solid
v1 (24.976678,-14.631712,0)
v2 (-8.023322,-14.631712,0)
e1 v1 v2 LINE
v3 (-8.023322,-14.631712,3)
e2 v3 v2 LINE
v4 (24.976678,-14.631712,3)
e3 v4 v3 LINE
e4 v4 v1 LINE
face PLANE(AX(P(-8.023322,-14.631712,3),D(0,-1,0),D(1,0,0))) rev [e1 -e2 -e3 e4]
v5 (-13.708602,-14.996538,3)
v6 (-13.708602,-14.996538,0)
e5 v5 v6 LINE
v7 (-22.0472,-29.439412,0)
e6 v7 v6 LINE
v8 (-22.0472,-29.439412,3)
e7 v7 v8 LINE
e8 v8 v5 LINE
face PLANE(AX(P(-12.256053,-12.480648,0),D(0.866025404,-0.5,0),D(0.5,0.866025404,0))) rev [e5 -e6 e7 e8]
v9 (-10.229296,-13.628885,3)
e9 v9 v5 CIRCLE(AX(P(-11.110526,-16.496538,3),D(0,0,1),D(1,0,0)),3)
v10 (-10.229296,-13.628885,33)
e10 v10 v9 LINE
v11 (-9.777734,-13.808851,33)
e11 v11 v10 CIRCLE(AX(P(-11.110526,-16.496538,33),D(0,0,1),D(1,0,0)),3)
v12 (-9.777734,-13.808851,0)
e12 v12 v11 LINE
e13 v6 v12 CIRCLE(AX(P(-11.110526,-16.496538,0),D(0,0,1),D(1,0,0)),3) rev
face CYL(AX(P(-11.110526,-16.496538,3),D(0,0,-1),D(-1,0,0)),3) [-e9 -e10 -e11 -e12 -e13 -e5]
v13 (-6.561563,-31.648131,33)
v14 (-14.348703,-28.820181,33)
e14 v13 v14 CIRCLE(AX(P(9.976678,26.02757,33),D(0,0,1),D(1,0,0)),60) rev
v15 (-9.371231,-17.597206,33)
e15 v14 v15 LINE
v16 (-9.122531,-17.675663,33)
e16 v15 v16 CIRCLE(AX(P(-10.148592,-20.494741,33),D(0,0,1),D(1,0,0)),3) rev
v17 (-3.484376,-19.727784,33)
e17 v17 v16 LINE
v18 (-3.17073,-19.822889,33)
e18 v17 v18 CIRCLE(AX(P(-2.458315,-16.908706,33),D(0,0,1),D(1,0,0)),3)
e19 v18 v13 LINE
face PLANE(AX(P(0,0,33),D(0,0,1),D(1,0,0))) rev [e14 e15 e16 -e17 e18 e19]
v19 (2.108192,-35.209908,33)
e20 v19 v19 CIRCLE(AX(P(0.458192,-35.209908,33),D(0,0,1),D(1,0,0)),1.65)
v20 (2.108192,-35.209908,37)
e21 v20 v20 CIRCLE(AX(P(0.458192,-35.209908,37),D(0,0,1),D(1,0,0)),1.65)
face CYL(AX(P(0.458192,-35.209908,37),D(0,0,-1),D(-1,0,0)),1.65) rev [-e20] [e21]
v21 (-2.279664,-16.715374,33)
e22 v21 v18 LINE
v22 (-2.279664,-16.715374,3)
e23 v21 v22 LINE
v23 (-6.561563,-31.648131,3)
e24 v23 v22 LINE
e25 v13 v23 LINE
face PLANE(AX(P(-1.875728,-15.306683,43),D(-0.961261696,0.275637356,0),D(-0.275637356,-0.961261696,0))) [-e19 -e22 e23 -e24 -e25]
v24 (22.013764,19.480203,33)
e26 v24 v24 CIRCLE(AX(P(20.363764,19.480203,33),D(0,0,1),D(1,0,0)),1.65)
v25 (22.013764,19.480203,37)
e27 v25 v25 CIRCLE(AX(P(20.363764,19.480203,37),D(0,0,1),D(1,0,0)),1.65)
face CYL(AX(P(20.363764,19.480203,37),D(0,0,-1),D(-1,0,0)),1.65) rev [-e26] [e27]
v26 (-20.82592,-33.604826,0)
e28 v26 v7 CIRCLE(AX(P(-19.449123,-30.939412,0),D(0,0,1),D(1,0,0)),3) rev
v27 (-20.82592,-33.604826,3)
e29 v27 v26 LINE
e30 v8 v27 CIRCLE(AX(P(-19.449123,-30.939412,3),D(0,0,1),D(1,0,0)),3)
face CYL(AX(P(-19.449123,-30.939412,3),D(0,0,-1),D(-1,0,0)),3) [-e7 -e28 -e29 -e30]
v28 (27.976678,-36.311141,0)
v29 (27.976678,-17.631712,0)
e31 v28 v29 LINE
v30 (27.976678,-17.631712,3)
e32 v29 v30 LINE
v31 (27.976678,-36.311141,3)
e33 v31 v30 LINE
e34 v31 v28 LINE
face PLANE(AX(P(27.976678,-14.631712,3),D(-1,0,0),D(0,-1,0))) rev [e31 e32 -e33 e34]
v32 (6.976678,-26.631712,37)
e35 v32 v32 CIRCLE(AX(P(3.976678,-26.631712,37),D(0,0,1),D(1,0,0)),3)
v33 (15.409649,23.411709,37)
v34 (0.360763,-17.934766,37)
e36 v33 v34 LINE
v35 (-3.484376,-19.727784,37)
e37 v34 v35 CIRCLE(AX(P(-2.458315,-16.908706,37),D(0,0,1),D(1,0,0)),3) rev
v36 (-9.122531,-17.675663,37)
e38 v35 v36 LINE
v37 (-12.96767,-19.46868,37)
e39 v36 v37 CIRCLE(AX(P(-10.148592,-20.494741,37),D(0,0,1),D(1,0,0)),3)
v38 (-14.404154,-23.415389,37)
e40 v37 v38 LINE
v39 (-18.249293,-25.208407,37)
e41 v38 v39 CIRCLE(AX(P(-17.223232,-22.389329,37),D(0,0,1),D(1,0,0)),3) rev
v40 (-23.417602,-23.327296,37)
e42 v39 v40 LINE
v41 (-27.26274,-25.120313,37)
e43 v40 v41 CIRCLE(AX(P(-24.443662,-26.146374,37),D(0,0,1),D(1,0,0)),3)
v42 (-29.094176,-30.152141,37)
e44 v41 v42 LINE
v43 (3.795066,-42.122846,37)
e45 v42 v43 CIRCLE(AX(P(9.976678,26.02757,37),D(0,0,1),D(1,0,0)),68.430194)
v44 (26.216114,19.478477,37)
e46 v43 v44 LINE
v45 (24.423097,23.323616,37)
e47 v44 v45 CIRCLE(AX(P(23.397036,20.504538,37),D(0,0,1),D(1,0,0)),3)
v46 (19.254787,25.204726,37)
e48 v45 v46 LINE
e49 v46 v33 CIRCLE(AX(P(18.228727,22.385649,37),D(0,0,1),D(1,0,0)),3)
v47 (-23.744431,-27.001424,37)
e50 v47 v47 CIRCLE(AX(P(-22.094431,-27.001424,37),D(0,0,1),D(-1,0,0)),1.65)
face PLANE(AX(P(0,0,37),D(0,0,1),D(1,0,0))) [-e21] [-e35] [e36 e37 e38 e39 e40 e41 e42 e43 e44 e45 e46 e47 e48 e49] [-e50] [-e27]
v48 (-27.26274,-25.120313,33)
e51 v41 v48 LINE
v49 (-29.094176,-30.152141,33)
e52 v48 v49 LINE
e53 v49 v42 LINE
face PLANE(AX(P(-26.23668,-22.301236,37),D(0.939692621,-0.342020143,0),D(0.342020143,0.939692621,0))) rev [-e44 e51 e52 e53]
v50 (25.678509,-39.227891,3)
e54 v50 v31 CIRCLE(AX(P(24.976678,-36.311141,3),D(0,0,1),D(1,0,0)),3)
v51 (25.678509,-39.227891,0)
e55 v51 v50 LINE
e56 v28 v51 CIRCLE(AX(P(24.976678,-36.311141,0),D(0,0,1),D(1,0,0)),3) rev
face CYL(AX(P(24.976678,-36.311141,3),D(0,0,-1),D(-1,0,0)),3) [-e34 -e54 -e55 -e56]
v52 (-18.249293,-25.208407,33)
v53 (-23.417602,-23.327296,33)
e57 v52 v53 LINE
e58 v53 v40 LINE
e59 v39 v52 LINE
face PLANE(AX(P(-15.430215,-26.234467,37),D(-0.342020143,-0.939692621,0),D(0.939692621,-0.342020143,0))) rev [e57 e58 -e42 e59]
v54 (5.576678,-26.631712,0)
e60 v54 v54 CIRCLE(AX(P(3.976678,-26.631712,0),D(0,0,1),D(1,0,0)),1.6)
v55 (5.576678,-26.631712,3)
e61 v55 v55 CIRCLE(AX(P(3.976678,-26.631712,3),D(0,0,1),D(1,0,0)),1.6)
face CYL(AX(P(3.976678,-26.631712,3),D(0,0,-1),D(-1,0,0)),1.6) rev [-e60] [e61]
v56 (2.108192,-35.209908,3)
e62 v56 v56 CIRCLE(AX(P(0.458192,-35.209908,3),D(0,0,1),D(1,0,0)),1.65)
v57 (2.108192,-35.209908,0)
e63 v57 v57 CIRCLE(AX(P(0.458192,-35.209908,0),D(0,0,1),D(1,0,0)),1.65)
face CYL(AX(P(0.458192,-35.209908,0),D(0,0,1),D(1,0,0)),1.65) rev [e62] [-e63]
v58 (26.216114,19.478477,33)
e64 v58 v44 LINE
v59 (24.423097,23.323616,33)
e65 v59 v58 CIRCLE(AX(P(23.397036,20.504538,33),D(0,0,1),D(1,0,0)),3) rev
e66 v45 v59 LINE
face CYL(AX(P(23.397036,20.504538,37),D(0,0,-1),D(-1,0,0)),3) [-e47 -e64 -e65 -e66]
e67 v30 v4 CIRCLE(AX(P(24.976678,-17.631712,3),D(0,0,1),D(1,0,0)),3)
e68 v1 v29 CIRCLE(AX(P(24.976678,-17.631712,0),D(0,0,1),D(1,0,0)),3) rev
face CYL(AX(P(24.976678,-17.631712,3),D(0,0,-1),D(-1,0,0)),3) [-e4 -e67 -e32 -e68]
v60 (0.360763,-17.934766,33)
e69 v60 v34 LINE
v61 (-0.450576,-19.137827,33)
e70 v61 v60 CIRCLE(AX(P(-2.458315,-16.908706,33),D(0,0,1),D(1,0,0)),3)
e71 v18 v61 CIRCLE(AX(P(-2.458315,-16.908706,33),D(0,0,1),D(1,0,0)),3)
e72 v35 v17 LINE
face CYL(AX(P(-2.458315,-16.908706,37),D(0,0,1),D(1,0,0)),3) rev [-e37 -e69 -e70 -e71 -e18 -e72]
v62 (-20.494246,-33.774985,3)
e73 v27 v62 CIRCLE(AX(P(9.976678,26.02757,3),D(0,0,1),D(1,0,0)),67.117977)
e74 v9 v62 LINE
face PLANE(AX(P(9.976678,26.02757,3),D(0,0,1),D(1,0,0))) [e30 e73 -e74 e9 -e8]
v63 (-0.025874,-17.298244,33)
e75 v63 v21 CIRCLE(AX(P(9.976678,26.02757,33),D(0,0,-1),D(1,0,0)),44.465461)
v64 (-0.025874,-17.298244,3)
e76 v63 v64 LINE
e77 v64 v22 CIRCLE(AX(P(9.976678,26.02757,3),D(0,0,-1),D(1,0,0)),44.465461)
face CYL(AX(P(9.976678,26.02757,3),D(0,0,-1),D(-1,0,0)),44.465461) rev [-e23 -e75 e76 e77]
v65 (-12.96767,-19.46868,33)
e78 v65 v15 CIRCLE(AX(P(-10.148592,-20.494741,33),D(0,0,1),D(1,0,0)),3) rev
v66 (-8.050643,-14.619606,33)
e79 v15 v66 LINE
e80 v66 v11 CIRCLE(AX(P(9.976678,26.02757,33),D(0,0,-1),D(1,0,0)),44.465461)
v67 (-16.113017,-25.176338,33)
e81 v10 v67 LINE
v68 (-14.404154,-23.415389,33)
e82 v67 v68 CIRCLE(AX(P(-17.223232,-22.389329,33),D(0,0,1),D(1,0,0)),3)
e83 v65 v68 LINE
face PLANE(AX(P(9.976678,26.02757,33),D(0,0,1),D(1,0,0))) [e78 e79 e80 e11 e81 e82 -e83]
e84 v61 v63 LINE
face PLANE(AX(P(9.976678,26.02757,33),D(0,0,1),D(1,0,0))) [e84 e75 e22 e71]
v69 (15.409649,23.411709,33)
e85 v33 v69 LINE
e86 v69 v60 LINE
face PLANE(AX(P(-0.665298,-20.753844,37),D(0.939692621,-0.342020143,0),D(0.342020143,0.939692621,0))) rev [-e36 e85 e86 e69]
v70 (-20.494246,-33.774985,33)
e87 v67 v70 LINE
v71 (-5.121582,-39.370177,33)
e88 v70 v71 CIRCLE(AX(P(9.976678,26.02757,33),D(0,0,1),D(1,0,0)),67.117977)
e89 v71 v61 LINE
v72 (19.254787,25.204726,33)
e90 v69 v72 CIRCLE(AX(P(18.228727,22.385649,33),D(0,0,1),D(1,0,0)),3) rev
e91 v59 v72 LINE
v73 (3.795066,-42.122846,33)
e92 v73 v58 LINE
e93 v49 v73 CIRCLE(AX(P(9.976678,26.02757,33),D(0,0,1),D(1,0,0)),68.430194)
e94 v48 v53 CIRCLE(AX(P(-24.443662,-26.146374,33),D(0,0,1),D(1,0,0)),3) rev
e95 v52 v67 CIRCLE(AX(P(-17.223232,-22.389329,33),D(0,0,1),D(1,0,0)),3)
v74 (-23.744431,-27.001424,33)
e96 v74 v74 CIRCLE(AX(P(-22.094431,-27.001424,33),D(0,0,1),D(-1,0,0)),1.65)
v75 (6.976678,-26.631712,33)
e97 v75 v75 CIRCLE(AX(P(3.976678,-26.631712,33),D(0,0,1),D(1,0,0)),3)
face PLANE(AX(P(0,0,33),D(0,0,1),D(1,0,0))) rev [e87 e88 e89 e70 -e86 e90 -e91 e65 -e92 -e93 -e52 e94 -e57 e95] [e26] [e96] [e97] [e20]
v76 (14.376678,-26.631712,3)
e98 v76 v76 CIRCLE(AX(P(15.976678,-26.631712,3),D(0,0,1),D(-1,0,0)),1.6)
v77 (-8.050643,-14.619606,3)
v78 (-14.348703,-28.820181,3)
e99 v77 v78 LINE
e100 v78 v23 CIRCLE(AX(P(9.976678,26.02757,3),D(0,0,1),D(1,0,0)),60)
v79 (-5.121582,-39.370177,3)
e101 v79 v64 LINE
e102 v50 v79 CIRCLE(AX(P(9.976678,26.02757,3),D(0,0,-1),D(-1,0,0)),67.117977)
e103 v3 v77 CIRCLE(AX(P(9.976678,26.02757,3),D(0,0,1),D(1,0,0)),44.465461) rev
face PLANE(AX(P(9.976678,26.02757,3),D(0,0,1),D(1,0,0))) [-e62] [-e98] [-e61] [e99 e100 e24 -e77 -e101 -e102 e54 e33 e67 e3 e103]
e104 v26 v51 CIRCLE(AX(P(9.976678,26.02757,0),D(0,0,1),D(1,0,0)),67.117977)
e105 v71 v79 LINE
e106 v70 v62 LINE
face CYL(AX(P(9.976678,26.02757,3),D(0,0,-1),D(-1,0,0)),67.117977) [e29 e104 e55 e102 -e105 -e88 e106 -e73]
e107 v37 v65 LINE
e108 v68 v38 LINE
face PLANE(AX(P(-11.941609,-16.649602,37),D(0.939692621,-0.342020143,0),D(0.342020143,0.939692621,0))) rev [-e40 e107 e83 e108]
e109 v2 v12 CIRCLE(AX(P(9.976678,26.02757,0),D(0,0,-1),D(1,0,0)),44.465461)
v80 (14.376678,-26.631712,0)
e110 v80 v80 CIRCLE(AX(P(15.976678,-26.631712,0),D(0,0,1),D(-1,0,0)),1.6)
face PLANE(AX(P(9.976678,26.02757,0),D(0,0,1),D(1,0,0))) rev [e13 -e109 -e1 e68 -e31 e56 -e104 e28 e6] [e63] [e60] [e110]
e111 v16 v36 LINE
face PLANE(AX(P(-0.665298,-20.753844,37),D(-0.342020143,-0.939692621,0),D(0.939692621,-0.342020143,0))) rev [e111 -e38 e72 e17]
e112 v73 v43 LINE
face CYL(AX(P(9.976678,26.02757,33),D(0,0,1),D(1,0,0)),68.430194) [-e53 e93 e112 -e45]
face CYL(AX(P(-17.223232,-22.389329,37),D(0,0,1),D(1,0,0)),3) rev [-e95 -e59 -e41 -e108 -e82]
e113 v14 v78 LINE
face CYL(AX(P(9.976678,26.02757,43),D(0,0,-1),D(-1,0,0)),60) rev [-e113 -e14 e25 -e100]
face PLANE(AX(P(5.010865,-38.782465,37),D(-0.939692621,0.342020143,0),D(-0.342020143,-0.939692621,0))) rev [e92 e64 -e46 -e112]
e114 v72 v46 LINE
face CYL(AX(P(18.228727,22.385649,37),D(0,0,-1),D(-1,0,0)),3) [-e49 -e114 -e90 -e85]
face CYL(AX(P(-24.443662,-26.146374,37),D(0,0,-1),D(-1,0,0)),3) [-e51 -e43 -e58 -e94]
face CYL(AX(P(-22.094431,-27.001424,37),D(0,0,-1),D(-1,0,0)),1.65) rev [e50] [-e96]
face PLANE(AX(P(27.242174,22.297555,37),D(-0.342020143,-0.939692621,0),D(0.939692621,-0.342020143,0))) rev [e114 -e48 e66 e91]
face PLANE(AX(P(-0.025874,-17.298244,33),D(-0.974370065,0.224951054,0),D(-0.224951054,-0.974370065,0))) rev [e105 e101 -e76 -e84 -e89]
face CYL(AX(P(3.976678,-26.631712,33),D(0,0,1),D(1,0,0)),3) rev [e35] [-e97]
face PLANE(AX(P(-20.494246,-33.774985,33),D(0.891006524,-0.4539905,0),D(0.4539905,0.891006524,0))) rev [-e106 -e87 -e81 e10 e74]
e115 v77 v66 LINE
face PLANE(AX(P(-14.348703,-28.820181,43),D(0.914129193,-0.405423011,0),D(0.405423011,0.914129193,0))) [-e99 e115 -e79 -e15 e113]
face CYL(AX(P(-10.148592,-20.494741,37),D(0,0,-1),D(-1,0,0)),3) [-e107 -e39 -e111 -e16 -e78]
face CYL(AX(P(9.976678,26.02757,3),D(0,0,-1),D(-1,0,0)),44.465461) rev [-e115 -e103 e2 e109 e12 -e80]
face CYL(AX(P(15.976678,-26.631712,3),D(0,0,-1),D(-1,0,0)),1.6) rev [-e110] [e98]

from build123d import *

# Parameters (mm, degrees)
SKETCH_1_R          = 1.600000000000001
SKETCH_1_R_2        = 1.6000000000000019
SKETCH_1_R_3        = 1.5999999999999985
EXTRUDE_1_DEPTH     = 3
EXTRUDE_2_DEPTH     = 30
CUT_EXTRUDE_1_DEPTH = 40
SKETCH_4_R          = 1.6499999999999986
SKETCH_4_R_2        = 1.6499999999999997
EXTRUDE_3_DEPTH     = 4
CUT_EXTRUDE_START   = -3
CUT_EXTRUDE_5_DEPTH = 3
EXTRUDE_4_DEPTH     = 3
FILLET_2_R          = 3
EXTRUDE_5_DEPTH     = 4
SKETCH_10_R         = 2.9999999999999996
CUT_EXTRUDE_6_DEPTH = 4
SKETCH_11_R         = 1.6500000000000008
CUT_EXTRUDE_7_DEPTH = 62.45571715470519


with BuildPart() as part:
    # 草图1 → 凸台-拉伸1 (new body)
    with BuildSketch(Plane.XY):
        with BuildLine():
            Line((-8.023322075989554, -14.631711796201198), (27.976677924010442, -14.631711796201193))
            Line((27.976677924010442, -14.631711796201193), (27.976677924010446, -38.631711796201195))
            Line((27.976677924010446, -38.631711796201195), (-8.023322075989551, -38.6317117962012))
            ThreePointArc((-8.023322075989551, -38.6317117962012), (-43.46930578748299, -14.57230150362017), (-57.14129859782335, 26.027570386525145))
            Line((-57.14129859782335, 26.027570386525145), (-34.48878313976992, 26.027570386525145))
            ThreePointArc((-34.48878313976992, 26.027570386525145), (-27.28963076602897, 1.7706236653637966), (-8.023322075989554, -14.631711796201198))
        make_face()
        with Locations((3.976677924010446, -26.6317117962012)):
            Circle(SKETCH_1_R, mode=Mode.SUBTRACT)
        with Locations(Location((15.976677924010446, -26.6317117962012, 0), (0, 0, 180))):
            Circle(SKETCH_1_R_2, mode=Mode.SUBTRACT)
        with Locations((-42.682604258715905, 20.02757038652514)):
            Circle(SKETCH_1_R_3, mode=Mode.SUBTRACT)
    extrude(amount=EXTRUDE_1_DEPTH)

    # 草图2 → 凸台-拉伸2 (add)
    with BuildSketch(Plane.XY.offset(3)):
        with BuildLine():
            Line((-20.49424577864387, -33.77498458475056), (-10.210218965484446, -13.591445522347069))
            ThreePointArc((-10.210218965484446, -13.591445522347069), (-5.231405442065514, -15.756295254952452), (-0.02587442417285965, -17.298243790895924))
            Line((-0.02587442417285965, -17.298243790895924), (-5.121581660002594, -39.370176745308015))
            ThreePointArc((-5.121581660002594, -39.370176745308015), (-12.979022025715798, -37.042696873124), (-20.49424577864387, -33.77498458475056))
        make_face()
    extrude(amount=EXTRUDE_2_DEPTH)

    # 草图3 → 切除-拉伸1 (cut)
    with BuildSketch(Plane.XY.offset(3)):
        with BuildLine():
            Line((-14.348702760927614, -28.820181203971632), (-7.456511566861831, -13.279984919997544))
            ThreePointArc((-7.456511566861831, -13.279984919997544), (-4.701142282615541, -14.38977235123981), (-1.875728376120071, -15.30668253882269))
            Line((-1.875728376120071, -15.30668253882269), (-6.561563425008877, -31.648131369774166))
            ThreePointArc((-6.561563425008877, -31.648131369774166), (-10.504001434072327, -30.368721805705025), (-14.348702760927614, -28.820181203971632))
        make_face()
    extrude(amount=CUT_EXTRUDE_1_DEPTH, mode=Mode.SUBTRACT)

    # 草图4 → 凸台-拉伸3 (add)
    with BuildSketch(Plane.XY.offset(33)):
        Polygon((-27.87837659400939, -26.811760111104594), (5.010865133497435, -38.782465127502874), (27.24217444966564, 22.297555223581274), (16.435709310627683, 26.230786871826414), (-0.6652978556555434, -20.753844167469087), (-11.941609305086462, -16.649602447561108), (-15.43021476700824, -26.234467179577372), (-26.236679906046202, -22.30123553133223), align=None)
        with Locations((20.36376431871485, 19.48020290794287)):
            Circle(SKETCH_4_R, mode=Mode.SUBTRACT)
        with Locations((0.4581919771611356, -35.20990762179707)):
            Circle(SKETCH_4_R_2, mode=Mode.SUBTRACT)
        with Locations(Location((-22.094430921700695, -27.001424181981108, 0), (0, 0, 180))):
            Circle(SKETCH_4_R, mode=Mode.SUBTRACT)
    extrude(amount=EXTRUDE_3_DEPTH)

    # 草图7 → 切除-拉伸5 (cut)
    with BuildSketch(Plane.XY.offset(3).offset(CUT_EXTRUDE_START)):
        with BuildLine():
            Line((-12.256052607879635, -12.480648485696536), (-23.582310336906296, -32.09830233199053))
            ThreePointArc((-23.582310336906296, -32.09830233199053), (-48.149194794505114, -7.53141787439181), (-57.14129859782335, 26.027570386525152))
            Line((-57.14129859782335, 26.027570386525152), (-34.48878313976992, 26.027570386525145))
            ThreePointArc((-34.48878313976992, 26.027570386525145), (-28.53154094821116, 3.794839854634926), (-12.256052607879635, -12.480648485696536))
        make_face()
    extrude(amount=CUT_EXTRUDE_5_DEPTH, mode=Mode.SUBTRACT)

    # 草图8 → 凸台-拉伸4 (add)
    with BuildSketch(Plane(origin=(0, 0, 0), x_dir=(-1, 0, 0), z_dir=(0, 0, -1))):
        with BuildLine():
            Line((-27.976677924010446, -38.631711796201195), (8.023322075989551, -38.6317117962012))
            ThreePointArc((8.023322075989551, -38.6317117962012), (-9.97667792401045, -41.090406135308655), (-27.976677924010446, -38.631711796201195))
        make_face()
    extrude(amount=-EXTRUDE_4_DEPTH)

    # 圆角2
    fillet_2_edges = [part.edges().sort_by_distance(p)[0] for p in [
        (-26.236679906046202, -22.30123553133223, 35),
    ]]
    fillet(fillet_2_edges, radius=FILLET_2_R)
    fillet_2_2_edges = [part.edges().sort_by_distance(p)[0] for p in [
        (27.24217444966564, 22.297555223581274, 35),
    ]]
    fillet(fillet_2_2_edges, radius=FILLET_2_R)
    fillet_2_3_edges = [part.edges().sort_by_distance(p)[0] for p in [
        (16.435709310627683, 26.230786871826414, 35),
    ]]
    fillet(fillet_2_3_edges, radius=FILLET_2_R)
    fillet_2_4_edges = [part.edges().sort_by_distance(p)[0] for p in [
        (27.976677924010446, -38.631711796201195, 1.5),
    ]]
    fillet(fillet_2_4_edges, radius=FILLET_2_R)
    fillet_2_5_edges = [part.edges().sort_by_distance(p)[0] for p in [
        (-23.5823103369063, -32.09830233199054, 1.5),
    ]]
    fillet(fillet_2_5_edges, radius=FILLET_2_R)
    fillet_2_6_edges = [part.edges().sort_by_distance(p)[0] for p in [
        (-12.256052607879633, -12.480648485696538, 1.5),
    ]]
    fillet(fillet_2_6_edges, radius=FILLET_2_R)
    fillet_2_7_edges = [part.edges().sort_by_distance(p)[0] for p in [
        (27.976677924010442, -14.631711796201193, 1.5),
    ]]
    fillet(fillet_2_7_edges, radius=FILLET_2_R)
    # the kernel refuses this fillet: 3 mm, written as the material it adds along each edge
    with BuildSketch(Plane(origin=(-0.6652978556555434, -20.753844167469087, 33), x_dir=(-0.93969262078591, 0.34202014332566444, 0), z_dir=(0, 0, 1))) as fillet_2_8_piece_1:
        with BuildLine():
            CenterArc((FILLET_2_R, -FILLET_2_R), FILLET_2_R, 89.99999999999999, 90.00000000000001)
            Line((5e-17, -FILLET_2_R), (-FILLET_2_R * 0.02, -FILLET_2_R))
            Line((-FILLET_2_R * 0.02, -FILLET_2_R), (-FILLET_2_R * 0.02, FILLET_2_R * 0.02))
            Line((-FILLET_2_R * 0.02, FILLET_2_R * 0.02), (FILLET_2_R, FILLET_2_R * 0.02))
            Line((FILLET_2_R, FILLET_2_R * 0.02), (FILLET_2_R, -5e-17))
        make_face()
    extrude(amount=4)
    # the kernel refuses this fillet: 3 mm, written as the material it takes off along each edge
    with BuildSketch(Plane(origin=(-11.941609305086462, -16.649602447561108, 33), x_dir=(0.9396926207859099, -0.3420201433256647, 0), z_dir=(0, 0, 1))) as fillet_2_9_piece_1:
        with BuildLine():
            CenterArc((FILLET_2_R, -FILLET_2_R), FILLET_2_R, 89.99999999999997, 90)
            Line((-2.84e-15, -FILLET_2_R), (-FILLET_2_R * 0.02, -FILLET_2_R))
            Line((-FILLET_2_R * 0.02, -FILLET_2_R), (-FILLET_2_R * 0.02, FILLET_2_R * 0.02))
            Line((-FILLET_2_R * 0.02, FILLET_2_R * 0.02), (FILLET_2_R, FILLET_2_R * 0.02))
            Line((FILLET_2_R, FILLET_2_R * 0.02), (FILLET_2_R, -5e-17))
        make_face()
    extrude(amount=11.5, mode=Mode.SUBTRACT)
    # the kernel refuses this fillet: 3 mm, written as the material it adds along each edge
    with BuildSketch(Plane(origin=(-15.43021476700824, -26.234467179577372, 33), x_dir=(0.34202014332566544, 0.9396926207859095, 0), z_dir=(0, 0, 1))) as fillet_2_10_piece_1:
        with BuildLine():
            CenterArc((FILLET_2_R, FILLET_2_R), FILLET_2_R, 180.00000000000006, 90)
            Line((-5.63e-15, FILLET_2_R), (-FILLET_2_R * 0.02, FILLET_2_R))
            Line((-FILLET_2_R * 0.02, FILLET_2_R), (-FILLET_2_R * 0.02, -FILLET_2_R * 0.02))
            Line((-FILLET_2_R * 0.02, -FILLET_2_R * 0.02), (FILLET_2_R, -FILLET_2_R * 0.02))
            Line((FILLET_2_R, -FILLET_2_R * 0.02), (FILLET_2_R, 9e-17))
        make_face()
    extrude(amount=4)

    # 草图9 → 凸台-拉伸5 (add)
    with BuildSketch(Plane.XY.offset(37.00000000000001)):
        with BuildLine():
            Line((-27.87837659400939, -26.811760111104594), (-29.094175630850113, -30.152140511419198))
            ThreePointArc((-29.094175630850113, -30.152140511419198), (-13.427826993623084, -38.27577838818826), (3.79506609665671, -42.12284552781748))
            Line((3.79506609665671, -42.12284552781748), (5.010865133497435, -38.782465127502874))
            Line((5.010865133497435, -38.782465127502874), (-27.87837659400939, -26.811760111104594))
        make_face()
    extrude(amount=-EXTRUDE_5_DEPTH)

    # 草图10 → 切除-拉伸6 (cut)
    with BuildSketch(Plane.XY.offset(37.00000000000001)):
        with Locations((3.976677924010446, -26.6317117962012)):
            Circle(SKETCH_10_R)
    extrude(amount=-CUT_EXTRUDE_6_DEPTH, mode=Mode.SUBTRACT)

    # 草图11 → 切除-拉伸7 (cut, through all)
    with BuildSketch(Plane.XY.offset(3)):
        with Locations((0.4581919771611356, -35.20990762179707)):
            Circle(SKETCH_11_R)
    extrude(amount=-CUT_EXTRUDE_7_DEPTH, mode=Mode.SUBTRACT)


solid = part.part
